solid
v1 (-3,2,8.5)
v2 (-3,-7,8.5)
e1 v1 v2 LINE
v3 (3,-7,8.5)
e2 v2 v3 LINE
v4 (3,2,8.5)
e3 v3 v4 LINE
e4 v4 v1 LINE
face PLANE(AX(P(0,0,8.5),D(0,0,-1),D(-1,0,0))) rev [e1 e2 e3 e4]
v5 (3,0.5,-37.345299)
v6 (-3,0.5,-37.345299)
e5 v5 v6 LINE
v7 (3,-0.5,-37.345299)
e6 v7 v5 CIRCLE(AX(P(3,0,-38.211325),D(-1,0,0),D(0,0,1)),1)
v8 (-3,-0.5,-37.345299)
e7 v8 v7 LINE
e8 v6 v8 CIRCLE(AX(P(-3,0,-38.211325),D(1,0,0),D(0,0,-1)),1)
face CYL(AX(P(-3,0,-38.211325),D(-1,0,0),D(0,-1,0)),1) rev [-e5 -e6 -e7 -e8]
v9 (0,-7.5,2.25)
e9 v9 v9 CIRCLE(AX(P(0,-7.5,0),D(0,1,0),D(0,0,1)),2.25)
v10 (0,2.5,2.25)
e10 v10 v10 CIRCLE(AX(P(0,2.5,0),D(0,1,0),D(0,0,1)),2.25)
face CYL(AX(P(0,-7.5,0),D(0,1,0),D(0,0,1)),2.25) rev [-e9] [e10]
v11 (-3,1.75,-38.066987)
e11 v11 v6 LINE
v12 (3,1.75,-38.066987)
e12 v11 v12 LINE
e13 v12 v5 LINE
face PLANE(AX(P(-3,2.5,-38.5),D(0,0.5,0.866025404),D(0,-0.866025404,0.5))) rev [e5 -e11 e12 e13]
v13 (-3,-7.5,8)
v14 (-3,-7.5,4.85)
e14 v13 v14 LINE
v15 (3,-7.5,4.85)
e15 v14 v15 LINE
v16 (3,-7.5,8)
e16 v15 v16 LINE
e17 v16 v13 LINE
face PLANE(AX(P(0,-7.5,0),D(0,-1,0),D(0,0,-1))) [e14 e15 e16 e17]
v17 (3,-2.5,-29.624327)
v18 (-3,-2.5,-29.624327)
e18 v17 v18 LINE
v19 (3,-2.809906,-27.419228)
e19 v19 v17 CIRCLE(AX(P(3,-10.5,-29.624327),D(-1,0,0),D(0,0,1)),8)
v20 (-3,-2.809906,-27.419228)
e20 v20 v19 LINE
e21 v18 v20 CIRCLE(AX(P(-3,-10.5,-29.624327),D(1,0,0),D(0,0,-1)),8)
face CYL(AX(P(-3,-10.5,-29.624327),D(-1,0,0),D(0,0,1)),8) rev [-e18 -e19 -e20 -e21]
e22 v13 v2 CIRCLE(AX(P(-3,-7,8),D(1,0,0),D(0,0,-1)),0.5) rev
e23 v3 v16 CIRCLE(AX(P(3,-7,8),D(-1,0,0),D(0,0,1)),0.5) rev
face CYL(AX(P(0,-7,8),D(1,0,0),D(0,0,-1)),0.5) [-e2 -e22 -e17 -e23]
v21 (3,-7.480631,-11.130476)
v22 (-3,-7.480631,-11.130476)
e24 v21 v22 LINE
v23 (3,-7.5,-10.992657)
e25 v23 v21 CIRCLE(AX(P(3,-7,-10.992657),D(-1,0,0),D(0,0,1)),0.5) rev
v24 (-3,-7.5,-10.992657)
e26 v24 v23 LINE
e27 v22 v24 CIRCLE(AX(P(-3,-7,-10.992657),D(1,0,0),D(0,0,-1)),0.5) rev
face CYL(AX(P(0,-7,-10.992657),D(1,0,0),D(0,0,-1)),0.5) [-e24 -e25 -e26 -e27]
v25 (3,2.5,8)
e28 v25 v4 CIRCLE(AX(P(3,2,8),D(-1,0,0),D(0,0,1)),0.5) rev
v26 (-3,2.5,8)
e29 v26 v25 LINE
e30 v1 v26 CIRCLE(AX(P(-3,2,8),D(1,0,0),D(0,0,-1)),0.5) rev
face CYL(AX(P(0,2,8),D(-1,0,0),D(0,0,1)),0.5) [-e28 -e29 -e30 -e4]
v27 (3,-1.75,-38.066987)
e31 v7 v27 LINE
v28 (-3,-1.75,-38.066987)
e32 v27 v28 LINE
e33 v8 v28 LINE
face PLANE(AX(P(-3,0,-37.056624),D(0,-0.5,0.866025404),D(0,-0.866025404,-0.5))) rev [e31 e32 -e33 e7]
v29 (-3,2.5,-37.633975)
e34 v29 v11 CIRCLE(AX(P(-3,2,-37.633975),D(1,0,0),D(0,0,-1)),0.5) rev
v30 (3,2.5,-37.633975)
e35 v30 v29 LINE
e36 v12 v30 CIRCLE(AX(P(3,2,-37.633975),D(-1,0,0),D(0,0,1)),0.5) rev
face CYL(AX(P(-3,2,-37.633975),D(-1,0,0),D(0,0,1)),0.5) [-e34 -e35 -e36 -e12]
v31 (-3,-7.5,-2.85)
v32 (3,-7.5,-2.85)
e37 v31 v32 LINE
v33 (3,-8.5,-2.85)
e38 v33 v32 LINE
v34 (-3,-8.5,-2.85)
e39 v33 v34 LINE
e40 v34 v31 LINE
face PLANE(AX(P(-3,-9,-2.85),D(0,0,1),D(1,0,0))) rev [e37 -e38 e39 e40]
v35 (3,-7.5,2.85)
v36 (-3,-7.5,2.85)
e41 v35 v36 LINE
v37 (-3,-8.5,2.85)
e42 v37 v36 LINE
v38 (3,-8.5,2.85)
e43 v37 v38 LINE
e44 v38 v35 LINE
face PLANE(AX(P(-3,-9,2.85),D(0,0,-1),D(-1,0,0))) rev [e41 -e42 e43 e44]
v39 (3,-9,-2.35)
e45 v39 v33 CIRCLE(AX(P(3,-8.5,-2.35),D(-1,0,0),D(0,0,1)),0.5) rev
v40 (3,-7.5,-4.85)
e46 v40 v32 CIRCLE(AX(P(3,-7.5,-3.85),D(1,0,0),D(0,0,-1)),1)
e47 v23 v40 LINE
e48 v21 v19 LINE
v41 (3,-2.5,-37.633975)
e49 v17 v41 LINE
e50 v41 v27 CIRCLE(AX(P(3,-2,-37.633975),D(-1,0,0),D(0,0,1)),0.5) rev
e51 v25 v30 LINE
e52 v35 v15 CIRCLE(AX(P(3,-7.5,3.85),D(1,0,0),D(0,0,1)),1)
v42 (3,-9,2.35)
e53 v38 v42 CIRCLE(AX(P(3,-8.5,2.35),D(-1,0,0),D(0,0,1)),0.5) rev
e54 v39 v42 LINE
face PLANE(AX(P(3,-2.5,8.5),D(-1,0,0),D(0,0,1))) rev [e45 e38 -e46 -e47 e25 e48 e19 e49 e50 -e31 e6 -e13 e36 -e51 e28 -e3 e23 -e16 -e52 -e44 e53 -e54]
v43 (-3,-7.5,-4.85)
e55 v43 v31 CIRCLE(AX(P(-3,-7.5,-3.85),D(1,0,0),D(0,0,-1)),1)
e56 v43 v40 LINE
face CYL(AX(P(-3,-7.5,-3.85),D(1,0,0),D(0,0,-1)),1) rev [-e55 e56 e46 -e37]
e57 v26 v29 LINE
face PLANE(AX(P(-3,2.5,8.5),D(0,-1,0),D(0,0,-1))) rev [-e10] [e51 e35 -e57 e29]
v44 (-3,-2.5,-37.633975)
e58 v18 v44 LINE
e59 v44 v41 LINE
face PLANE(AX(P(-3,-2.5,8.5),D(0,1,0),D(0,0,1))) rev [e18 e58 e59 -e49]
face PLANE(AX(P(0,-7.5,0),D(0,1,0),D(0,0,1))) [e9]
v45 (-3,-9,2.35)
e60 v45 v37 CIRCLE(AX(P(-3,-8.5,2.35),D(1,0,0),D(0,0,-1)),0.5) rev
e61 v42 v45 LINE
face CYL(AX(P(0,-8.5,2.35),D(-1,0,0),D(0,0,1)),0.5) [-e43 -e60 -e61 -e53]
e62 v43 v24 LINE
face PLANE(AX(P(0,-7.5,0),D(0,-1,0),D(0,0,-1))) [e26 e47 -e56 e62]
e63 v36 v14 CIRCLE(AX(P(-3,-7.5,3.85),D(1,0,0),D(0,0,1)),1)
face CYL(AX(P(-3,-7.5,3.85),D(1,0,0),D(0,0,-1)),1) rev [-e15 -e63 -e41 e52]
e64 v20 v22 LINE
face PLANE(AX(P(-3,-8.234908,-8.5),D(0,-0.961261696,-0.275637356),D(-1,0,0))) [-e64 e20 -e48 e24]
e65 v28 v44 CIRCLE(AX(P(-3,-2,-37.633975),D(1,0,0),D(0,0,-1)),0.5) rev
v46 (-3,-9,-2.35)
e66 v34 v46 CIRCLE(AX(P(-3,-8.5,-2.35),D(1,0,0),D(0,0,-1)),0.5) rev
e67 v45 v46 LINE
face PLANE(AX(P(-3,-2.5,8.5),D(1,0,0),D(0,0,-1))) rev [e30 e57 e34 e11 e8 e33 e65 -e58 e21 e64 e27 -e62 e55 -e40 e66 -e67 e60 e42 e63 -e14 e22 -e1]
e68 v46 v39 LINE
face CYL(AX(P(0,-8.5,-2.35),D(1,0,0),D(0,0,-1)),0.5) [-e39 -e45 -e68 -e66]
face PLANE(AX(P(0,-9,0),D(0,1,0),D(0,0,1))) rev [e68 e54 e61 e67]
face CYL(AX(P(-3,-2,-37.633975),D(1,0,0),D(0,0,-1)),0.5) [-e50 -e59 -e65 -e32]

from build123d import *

# Parameters (mm, degrees)
ESQUISSE1_W             = 6
ESQUISSE1_H             = 5
BOSS_EXTRU_1_DEPTH      = 8.5
ESQUISSE5_W             = 6
ESQUISSE5_H             = 5
BOSS_EXTRU_3_DEPTH      = 30
ENL_V_MAT_EXTRU_2_DEPTH = 40.044846011
ESQUISSE7_W             = 6
ESQUISSE7_H             = 17
BOSS_EXTRU_4_DEPTH      = 5
ESQUISSE2_R             = 2.25
ENL_V_MAT_EXTRU_1_DEPTH = 40.890475054
ESQUISSE9_W             = 6
ESQUISSE9_H             = 5.7
BOSS_EXTRU_6_DEPTH      = 1.5
ENL_V_MAT_EXTRU_3_DEPTH = 40.990623901
CHANFREIN2_SIZE         = 20
CHANFREIN2_SIZE_2       = 5.734907715
CONG_1_R                = 0.5
CONG_2_R                = 1
CONG_3_R                = 8


with BuildPart() as part:
    # Esquisse1 → Boss.-Extru.1 (new, symmetric)
    with BuildSketch(Plane.XY):
        Rectangle(ESQUISSE1_W, ESQUISSE1_H)
    extrude(amount=BOSS_EXTRU_1_DEPTH, both=True)

    # Esquisse5 → Boss.-Extru.3 (add)
    with BuildSketch(Plane(origin=(-2.5, 0, -8.5), x_dir=(1, 0, 0), z_dir=(0, 0, 1))):
        with Locations((2.5, 0)):
            Rectangle(ESQUISSE5_W, ESQUISSE5_H)
    extrude(amount=-BOSS_EXTRU_3_DEPTH)

    # Esquisse6 → Enlèv. mat.-Extru.2 (cut, through all)
    with BuildSketch(Plane(origin=(3, 0, 0), x_dir=(0, 0, -1), z_dir=(1, 0, 0))):
        Polygon((38.5, 2.5), (37.056624327, 0), (38.5, -2.5), align=None)
    extrude(amount=-ENL_V_MAT_EXTRU_2_DEPTH, mode=Mode.SUBTRACT)

    # Esquisse7 → Boss.-Extru.4 (add)
    with BuildSketch(Plane.XZ.offset(2.5)):
        Rectangle(ESQUISSE7_W, ESQUISSE7_H)
    extrude(amount=BOSS_EXTRU_4_DEPTH)

    # Esquisse2 → Enlèv. mat.-Extru.1 (cut, through all)
    with BuildSketch(Plane(origin=(0, 2.5, 0), x_dir=(1, 0, 0), z_dir=(0, 1, 0))):
        with Locations(Location((0, 0, 0), (0, 0, 270))):
            Circle(ESQUISSE2_R)
    extrude(amount=-ENL_V_MAT_EXTRU_1_DEPTH, mode=Mode.SUBTRACT)

    # Esquisse9 → Boss.-Extru.6 (add)
    with BuildSketch(Plane.XZ.offset(7.5)):
        Rectangle(ESQUISSE9_W, ESQUISSE9_H)
    extrude(amount=BOSS_EXTRU_6_DEPTH)

    # Esquisse10 → Enlèv. mat.-Extru.3 (cut, through all)
    with BuildSketch(Plane(origin=(3, 0, 0), x_dir=(0, 0, -1), z_dir=(1, 0, 0))):
        with BuildLine():
            Line((-4.85, -7.5), (-2.85, -7.5))
            ThreePointArc((-2.85, -7.5), (-3.85, -6.5), (-4.85, -7.5))
        make_face()
        with BuildLine():
            Line((4.85, -7.5), (2.85, -7.5))
            ThreePointArc((2.85, -7.5), (3.85, -6.5), (4.85, -7.5))
        make_face()
    extrude(amount=-ENL_V_MAT_EXTRU_3_DEPTH, mode=Mode.SUBTRACT)

    # Chanfrein2
    # the kernel refuses this chamfer: 20, 5.734907715 mm, written as the material it adds along each edge
    with BuildSketch(Plane(origin=(3, -2.5, -8.5), x_dir=(0, 0.010616657410321303, -0.9999436417045873), z_dir=(-1, 0, 0))) as chanfrein2_piece_1_section:
        Polygon((CHANFREIN2_SIZE * 0.999943641705, CHANFREIN2_SIZE * 0.0106166574103), (-CHANFREIN2_SIZE_2 * 0.0106166574106, CHANFREIN2_SIZE_2 * 0.999943641735), (0, 0), align=None)
    chanfrein2_piece_1 = extrude(amount=6, mode=Mode.PRIVATE)
    chanfrein2_piece_1 = split(chanfrein2_piece_1, bisect_by=Plane(origin=(0, -7.5, -15.61390523), z_dir=(0, 1, 0)), keep=Keep.TOP, mode=Mode.PRIVATE)
    add(chanfrein2_piece_1)

    # Congé1
    cong_1_edges = [part.edges().sort_by_distance(p)[0] for p in [
        (0, -2.5, -38.5),
        (0, 2.5, -38.5),
        (0, -7.5, 8.5),
        (0, -9, 2.85),
        (0, -9, -2.85),
        (0, 2.5, 8.5),
        (0, -7.5, -11.062927781),
    ]]
    fillet(cong_1_edges, radius=CONG_1_R)

    # Congé2
    cong_2_edges = [part.edges().sort_by_distance(p)[0] for p in [
        (0, 0, -37.056624327),
    ]]
    fillet(cong_2_edges, radius=CONG_2_R)

    # Congé3
    cong_3_edges = [part.edges().sort_by_distance(p)[0] for p in [
        (0, -2.5, -28.5),
    ]]
    fillet(cong_3_edges, radius=CONG_3_R)


solid = part.part
